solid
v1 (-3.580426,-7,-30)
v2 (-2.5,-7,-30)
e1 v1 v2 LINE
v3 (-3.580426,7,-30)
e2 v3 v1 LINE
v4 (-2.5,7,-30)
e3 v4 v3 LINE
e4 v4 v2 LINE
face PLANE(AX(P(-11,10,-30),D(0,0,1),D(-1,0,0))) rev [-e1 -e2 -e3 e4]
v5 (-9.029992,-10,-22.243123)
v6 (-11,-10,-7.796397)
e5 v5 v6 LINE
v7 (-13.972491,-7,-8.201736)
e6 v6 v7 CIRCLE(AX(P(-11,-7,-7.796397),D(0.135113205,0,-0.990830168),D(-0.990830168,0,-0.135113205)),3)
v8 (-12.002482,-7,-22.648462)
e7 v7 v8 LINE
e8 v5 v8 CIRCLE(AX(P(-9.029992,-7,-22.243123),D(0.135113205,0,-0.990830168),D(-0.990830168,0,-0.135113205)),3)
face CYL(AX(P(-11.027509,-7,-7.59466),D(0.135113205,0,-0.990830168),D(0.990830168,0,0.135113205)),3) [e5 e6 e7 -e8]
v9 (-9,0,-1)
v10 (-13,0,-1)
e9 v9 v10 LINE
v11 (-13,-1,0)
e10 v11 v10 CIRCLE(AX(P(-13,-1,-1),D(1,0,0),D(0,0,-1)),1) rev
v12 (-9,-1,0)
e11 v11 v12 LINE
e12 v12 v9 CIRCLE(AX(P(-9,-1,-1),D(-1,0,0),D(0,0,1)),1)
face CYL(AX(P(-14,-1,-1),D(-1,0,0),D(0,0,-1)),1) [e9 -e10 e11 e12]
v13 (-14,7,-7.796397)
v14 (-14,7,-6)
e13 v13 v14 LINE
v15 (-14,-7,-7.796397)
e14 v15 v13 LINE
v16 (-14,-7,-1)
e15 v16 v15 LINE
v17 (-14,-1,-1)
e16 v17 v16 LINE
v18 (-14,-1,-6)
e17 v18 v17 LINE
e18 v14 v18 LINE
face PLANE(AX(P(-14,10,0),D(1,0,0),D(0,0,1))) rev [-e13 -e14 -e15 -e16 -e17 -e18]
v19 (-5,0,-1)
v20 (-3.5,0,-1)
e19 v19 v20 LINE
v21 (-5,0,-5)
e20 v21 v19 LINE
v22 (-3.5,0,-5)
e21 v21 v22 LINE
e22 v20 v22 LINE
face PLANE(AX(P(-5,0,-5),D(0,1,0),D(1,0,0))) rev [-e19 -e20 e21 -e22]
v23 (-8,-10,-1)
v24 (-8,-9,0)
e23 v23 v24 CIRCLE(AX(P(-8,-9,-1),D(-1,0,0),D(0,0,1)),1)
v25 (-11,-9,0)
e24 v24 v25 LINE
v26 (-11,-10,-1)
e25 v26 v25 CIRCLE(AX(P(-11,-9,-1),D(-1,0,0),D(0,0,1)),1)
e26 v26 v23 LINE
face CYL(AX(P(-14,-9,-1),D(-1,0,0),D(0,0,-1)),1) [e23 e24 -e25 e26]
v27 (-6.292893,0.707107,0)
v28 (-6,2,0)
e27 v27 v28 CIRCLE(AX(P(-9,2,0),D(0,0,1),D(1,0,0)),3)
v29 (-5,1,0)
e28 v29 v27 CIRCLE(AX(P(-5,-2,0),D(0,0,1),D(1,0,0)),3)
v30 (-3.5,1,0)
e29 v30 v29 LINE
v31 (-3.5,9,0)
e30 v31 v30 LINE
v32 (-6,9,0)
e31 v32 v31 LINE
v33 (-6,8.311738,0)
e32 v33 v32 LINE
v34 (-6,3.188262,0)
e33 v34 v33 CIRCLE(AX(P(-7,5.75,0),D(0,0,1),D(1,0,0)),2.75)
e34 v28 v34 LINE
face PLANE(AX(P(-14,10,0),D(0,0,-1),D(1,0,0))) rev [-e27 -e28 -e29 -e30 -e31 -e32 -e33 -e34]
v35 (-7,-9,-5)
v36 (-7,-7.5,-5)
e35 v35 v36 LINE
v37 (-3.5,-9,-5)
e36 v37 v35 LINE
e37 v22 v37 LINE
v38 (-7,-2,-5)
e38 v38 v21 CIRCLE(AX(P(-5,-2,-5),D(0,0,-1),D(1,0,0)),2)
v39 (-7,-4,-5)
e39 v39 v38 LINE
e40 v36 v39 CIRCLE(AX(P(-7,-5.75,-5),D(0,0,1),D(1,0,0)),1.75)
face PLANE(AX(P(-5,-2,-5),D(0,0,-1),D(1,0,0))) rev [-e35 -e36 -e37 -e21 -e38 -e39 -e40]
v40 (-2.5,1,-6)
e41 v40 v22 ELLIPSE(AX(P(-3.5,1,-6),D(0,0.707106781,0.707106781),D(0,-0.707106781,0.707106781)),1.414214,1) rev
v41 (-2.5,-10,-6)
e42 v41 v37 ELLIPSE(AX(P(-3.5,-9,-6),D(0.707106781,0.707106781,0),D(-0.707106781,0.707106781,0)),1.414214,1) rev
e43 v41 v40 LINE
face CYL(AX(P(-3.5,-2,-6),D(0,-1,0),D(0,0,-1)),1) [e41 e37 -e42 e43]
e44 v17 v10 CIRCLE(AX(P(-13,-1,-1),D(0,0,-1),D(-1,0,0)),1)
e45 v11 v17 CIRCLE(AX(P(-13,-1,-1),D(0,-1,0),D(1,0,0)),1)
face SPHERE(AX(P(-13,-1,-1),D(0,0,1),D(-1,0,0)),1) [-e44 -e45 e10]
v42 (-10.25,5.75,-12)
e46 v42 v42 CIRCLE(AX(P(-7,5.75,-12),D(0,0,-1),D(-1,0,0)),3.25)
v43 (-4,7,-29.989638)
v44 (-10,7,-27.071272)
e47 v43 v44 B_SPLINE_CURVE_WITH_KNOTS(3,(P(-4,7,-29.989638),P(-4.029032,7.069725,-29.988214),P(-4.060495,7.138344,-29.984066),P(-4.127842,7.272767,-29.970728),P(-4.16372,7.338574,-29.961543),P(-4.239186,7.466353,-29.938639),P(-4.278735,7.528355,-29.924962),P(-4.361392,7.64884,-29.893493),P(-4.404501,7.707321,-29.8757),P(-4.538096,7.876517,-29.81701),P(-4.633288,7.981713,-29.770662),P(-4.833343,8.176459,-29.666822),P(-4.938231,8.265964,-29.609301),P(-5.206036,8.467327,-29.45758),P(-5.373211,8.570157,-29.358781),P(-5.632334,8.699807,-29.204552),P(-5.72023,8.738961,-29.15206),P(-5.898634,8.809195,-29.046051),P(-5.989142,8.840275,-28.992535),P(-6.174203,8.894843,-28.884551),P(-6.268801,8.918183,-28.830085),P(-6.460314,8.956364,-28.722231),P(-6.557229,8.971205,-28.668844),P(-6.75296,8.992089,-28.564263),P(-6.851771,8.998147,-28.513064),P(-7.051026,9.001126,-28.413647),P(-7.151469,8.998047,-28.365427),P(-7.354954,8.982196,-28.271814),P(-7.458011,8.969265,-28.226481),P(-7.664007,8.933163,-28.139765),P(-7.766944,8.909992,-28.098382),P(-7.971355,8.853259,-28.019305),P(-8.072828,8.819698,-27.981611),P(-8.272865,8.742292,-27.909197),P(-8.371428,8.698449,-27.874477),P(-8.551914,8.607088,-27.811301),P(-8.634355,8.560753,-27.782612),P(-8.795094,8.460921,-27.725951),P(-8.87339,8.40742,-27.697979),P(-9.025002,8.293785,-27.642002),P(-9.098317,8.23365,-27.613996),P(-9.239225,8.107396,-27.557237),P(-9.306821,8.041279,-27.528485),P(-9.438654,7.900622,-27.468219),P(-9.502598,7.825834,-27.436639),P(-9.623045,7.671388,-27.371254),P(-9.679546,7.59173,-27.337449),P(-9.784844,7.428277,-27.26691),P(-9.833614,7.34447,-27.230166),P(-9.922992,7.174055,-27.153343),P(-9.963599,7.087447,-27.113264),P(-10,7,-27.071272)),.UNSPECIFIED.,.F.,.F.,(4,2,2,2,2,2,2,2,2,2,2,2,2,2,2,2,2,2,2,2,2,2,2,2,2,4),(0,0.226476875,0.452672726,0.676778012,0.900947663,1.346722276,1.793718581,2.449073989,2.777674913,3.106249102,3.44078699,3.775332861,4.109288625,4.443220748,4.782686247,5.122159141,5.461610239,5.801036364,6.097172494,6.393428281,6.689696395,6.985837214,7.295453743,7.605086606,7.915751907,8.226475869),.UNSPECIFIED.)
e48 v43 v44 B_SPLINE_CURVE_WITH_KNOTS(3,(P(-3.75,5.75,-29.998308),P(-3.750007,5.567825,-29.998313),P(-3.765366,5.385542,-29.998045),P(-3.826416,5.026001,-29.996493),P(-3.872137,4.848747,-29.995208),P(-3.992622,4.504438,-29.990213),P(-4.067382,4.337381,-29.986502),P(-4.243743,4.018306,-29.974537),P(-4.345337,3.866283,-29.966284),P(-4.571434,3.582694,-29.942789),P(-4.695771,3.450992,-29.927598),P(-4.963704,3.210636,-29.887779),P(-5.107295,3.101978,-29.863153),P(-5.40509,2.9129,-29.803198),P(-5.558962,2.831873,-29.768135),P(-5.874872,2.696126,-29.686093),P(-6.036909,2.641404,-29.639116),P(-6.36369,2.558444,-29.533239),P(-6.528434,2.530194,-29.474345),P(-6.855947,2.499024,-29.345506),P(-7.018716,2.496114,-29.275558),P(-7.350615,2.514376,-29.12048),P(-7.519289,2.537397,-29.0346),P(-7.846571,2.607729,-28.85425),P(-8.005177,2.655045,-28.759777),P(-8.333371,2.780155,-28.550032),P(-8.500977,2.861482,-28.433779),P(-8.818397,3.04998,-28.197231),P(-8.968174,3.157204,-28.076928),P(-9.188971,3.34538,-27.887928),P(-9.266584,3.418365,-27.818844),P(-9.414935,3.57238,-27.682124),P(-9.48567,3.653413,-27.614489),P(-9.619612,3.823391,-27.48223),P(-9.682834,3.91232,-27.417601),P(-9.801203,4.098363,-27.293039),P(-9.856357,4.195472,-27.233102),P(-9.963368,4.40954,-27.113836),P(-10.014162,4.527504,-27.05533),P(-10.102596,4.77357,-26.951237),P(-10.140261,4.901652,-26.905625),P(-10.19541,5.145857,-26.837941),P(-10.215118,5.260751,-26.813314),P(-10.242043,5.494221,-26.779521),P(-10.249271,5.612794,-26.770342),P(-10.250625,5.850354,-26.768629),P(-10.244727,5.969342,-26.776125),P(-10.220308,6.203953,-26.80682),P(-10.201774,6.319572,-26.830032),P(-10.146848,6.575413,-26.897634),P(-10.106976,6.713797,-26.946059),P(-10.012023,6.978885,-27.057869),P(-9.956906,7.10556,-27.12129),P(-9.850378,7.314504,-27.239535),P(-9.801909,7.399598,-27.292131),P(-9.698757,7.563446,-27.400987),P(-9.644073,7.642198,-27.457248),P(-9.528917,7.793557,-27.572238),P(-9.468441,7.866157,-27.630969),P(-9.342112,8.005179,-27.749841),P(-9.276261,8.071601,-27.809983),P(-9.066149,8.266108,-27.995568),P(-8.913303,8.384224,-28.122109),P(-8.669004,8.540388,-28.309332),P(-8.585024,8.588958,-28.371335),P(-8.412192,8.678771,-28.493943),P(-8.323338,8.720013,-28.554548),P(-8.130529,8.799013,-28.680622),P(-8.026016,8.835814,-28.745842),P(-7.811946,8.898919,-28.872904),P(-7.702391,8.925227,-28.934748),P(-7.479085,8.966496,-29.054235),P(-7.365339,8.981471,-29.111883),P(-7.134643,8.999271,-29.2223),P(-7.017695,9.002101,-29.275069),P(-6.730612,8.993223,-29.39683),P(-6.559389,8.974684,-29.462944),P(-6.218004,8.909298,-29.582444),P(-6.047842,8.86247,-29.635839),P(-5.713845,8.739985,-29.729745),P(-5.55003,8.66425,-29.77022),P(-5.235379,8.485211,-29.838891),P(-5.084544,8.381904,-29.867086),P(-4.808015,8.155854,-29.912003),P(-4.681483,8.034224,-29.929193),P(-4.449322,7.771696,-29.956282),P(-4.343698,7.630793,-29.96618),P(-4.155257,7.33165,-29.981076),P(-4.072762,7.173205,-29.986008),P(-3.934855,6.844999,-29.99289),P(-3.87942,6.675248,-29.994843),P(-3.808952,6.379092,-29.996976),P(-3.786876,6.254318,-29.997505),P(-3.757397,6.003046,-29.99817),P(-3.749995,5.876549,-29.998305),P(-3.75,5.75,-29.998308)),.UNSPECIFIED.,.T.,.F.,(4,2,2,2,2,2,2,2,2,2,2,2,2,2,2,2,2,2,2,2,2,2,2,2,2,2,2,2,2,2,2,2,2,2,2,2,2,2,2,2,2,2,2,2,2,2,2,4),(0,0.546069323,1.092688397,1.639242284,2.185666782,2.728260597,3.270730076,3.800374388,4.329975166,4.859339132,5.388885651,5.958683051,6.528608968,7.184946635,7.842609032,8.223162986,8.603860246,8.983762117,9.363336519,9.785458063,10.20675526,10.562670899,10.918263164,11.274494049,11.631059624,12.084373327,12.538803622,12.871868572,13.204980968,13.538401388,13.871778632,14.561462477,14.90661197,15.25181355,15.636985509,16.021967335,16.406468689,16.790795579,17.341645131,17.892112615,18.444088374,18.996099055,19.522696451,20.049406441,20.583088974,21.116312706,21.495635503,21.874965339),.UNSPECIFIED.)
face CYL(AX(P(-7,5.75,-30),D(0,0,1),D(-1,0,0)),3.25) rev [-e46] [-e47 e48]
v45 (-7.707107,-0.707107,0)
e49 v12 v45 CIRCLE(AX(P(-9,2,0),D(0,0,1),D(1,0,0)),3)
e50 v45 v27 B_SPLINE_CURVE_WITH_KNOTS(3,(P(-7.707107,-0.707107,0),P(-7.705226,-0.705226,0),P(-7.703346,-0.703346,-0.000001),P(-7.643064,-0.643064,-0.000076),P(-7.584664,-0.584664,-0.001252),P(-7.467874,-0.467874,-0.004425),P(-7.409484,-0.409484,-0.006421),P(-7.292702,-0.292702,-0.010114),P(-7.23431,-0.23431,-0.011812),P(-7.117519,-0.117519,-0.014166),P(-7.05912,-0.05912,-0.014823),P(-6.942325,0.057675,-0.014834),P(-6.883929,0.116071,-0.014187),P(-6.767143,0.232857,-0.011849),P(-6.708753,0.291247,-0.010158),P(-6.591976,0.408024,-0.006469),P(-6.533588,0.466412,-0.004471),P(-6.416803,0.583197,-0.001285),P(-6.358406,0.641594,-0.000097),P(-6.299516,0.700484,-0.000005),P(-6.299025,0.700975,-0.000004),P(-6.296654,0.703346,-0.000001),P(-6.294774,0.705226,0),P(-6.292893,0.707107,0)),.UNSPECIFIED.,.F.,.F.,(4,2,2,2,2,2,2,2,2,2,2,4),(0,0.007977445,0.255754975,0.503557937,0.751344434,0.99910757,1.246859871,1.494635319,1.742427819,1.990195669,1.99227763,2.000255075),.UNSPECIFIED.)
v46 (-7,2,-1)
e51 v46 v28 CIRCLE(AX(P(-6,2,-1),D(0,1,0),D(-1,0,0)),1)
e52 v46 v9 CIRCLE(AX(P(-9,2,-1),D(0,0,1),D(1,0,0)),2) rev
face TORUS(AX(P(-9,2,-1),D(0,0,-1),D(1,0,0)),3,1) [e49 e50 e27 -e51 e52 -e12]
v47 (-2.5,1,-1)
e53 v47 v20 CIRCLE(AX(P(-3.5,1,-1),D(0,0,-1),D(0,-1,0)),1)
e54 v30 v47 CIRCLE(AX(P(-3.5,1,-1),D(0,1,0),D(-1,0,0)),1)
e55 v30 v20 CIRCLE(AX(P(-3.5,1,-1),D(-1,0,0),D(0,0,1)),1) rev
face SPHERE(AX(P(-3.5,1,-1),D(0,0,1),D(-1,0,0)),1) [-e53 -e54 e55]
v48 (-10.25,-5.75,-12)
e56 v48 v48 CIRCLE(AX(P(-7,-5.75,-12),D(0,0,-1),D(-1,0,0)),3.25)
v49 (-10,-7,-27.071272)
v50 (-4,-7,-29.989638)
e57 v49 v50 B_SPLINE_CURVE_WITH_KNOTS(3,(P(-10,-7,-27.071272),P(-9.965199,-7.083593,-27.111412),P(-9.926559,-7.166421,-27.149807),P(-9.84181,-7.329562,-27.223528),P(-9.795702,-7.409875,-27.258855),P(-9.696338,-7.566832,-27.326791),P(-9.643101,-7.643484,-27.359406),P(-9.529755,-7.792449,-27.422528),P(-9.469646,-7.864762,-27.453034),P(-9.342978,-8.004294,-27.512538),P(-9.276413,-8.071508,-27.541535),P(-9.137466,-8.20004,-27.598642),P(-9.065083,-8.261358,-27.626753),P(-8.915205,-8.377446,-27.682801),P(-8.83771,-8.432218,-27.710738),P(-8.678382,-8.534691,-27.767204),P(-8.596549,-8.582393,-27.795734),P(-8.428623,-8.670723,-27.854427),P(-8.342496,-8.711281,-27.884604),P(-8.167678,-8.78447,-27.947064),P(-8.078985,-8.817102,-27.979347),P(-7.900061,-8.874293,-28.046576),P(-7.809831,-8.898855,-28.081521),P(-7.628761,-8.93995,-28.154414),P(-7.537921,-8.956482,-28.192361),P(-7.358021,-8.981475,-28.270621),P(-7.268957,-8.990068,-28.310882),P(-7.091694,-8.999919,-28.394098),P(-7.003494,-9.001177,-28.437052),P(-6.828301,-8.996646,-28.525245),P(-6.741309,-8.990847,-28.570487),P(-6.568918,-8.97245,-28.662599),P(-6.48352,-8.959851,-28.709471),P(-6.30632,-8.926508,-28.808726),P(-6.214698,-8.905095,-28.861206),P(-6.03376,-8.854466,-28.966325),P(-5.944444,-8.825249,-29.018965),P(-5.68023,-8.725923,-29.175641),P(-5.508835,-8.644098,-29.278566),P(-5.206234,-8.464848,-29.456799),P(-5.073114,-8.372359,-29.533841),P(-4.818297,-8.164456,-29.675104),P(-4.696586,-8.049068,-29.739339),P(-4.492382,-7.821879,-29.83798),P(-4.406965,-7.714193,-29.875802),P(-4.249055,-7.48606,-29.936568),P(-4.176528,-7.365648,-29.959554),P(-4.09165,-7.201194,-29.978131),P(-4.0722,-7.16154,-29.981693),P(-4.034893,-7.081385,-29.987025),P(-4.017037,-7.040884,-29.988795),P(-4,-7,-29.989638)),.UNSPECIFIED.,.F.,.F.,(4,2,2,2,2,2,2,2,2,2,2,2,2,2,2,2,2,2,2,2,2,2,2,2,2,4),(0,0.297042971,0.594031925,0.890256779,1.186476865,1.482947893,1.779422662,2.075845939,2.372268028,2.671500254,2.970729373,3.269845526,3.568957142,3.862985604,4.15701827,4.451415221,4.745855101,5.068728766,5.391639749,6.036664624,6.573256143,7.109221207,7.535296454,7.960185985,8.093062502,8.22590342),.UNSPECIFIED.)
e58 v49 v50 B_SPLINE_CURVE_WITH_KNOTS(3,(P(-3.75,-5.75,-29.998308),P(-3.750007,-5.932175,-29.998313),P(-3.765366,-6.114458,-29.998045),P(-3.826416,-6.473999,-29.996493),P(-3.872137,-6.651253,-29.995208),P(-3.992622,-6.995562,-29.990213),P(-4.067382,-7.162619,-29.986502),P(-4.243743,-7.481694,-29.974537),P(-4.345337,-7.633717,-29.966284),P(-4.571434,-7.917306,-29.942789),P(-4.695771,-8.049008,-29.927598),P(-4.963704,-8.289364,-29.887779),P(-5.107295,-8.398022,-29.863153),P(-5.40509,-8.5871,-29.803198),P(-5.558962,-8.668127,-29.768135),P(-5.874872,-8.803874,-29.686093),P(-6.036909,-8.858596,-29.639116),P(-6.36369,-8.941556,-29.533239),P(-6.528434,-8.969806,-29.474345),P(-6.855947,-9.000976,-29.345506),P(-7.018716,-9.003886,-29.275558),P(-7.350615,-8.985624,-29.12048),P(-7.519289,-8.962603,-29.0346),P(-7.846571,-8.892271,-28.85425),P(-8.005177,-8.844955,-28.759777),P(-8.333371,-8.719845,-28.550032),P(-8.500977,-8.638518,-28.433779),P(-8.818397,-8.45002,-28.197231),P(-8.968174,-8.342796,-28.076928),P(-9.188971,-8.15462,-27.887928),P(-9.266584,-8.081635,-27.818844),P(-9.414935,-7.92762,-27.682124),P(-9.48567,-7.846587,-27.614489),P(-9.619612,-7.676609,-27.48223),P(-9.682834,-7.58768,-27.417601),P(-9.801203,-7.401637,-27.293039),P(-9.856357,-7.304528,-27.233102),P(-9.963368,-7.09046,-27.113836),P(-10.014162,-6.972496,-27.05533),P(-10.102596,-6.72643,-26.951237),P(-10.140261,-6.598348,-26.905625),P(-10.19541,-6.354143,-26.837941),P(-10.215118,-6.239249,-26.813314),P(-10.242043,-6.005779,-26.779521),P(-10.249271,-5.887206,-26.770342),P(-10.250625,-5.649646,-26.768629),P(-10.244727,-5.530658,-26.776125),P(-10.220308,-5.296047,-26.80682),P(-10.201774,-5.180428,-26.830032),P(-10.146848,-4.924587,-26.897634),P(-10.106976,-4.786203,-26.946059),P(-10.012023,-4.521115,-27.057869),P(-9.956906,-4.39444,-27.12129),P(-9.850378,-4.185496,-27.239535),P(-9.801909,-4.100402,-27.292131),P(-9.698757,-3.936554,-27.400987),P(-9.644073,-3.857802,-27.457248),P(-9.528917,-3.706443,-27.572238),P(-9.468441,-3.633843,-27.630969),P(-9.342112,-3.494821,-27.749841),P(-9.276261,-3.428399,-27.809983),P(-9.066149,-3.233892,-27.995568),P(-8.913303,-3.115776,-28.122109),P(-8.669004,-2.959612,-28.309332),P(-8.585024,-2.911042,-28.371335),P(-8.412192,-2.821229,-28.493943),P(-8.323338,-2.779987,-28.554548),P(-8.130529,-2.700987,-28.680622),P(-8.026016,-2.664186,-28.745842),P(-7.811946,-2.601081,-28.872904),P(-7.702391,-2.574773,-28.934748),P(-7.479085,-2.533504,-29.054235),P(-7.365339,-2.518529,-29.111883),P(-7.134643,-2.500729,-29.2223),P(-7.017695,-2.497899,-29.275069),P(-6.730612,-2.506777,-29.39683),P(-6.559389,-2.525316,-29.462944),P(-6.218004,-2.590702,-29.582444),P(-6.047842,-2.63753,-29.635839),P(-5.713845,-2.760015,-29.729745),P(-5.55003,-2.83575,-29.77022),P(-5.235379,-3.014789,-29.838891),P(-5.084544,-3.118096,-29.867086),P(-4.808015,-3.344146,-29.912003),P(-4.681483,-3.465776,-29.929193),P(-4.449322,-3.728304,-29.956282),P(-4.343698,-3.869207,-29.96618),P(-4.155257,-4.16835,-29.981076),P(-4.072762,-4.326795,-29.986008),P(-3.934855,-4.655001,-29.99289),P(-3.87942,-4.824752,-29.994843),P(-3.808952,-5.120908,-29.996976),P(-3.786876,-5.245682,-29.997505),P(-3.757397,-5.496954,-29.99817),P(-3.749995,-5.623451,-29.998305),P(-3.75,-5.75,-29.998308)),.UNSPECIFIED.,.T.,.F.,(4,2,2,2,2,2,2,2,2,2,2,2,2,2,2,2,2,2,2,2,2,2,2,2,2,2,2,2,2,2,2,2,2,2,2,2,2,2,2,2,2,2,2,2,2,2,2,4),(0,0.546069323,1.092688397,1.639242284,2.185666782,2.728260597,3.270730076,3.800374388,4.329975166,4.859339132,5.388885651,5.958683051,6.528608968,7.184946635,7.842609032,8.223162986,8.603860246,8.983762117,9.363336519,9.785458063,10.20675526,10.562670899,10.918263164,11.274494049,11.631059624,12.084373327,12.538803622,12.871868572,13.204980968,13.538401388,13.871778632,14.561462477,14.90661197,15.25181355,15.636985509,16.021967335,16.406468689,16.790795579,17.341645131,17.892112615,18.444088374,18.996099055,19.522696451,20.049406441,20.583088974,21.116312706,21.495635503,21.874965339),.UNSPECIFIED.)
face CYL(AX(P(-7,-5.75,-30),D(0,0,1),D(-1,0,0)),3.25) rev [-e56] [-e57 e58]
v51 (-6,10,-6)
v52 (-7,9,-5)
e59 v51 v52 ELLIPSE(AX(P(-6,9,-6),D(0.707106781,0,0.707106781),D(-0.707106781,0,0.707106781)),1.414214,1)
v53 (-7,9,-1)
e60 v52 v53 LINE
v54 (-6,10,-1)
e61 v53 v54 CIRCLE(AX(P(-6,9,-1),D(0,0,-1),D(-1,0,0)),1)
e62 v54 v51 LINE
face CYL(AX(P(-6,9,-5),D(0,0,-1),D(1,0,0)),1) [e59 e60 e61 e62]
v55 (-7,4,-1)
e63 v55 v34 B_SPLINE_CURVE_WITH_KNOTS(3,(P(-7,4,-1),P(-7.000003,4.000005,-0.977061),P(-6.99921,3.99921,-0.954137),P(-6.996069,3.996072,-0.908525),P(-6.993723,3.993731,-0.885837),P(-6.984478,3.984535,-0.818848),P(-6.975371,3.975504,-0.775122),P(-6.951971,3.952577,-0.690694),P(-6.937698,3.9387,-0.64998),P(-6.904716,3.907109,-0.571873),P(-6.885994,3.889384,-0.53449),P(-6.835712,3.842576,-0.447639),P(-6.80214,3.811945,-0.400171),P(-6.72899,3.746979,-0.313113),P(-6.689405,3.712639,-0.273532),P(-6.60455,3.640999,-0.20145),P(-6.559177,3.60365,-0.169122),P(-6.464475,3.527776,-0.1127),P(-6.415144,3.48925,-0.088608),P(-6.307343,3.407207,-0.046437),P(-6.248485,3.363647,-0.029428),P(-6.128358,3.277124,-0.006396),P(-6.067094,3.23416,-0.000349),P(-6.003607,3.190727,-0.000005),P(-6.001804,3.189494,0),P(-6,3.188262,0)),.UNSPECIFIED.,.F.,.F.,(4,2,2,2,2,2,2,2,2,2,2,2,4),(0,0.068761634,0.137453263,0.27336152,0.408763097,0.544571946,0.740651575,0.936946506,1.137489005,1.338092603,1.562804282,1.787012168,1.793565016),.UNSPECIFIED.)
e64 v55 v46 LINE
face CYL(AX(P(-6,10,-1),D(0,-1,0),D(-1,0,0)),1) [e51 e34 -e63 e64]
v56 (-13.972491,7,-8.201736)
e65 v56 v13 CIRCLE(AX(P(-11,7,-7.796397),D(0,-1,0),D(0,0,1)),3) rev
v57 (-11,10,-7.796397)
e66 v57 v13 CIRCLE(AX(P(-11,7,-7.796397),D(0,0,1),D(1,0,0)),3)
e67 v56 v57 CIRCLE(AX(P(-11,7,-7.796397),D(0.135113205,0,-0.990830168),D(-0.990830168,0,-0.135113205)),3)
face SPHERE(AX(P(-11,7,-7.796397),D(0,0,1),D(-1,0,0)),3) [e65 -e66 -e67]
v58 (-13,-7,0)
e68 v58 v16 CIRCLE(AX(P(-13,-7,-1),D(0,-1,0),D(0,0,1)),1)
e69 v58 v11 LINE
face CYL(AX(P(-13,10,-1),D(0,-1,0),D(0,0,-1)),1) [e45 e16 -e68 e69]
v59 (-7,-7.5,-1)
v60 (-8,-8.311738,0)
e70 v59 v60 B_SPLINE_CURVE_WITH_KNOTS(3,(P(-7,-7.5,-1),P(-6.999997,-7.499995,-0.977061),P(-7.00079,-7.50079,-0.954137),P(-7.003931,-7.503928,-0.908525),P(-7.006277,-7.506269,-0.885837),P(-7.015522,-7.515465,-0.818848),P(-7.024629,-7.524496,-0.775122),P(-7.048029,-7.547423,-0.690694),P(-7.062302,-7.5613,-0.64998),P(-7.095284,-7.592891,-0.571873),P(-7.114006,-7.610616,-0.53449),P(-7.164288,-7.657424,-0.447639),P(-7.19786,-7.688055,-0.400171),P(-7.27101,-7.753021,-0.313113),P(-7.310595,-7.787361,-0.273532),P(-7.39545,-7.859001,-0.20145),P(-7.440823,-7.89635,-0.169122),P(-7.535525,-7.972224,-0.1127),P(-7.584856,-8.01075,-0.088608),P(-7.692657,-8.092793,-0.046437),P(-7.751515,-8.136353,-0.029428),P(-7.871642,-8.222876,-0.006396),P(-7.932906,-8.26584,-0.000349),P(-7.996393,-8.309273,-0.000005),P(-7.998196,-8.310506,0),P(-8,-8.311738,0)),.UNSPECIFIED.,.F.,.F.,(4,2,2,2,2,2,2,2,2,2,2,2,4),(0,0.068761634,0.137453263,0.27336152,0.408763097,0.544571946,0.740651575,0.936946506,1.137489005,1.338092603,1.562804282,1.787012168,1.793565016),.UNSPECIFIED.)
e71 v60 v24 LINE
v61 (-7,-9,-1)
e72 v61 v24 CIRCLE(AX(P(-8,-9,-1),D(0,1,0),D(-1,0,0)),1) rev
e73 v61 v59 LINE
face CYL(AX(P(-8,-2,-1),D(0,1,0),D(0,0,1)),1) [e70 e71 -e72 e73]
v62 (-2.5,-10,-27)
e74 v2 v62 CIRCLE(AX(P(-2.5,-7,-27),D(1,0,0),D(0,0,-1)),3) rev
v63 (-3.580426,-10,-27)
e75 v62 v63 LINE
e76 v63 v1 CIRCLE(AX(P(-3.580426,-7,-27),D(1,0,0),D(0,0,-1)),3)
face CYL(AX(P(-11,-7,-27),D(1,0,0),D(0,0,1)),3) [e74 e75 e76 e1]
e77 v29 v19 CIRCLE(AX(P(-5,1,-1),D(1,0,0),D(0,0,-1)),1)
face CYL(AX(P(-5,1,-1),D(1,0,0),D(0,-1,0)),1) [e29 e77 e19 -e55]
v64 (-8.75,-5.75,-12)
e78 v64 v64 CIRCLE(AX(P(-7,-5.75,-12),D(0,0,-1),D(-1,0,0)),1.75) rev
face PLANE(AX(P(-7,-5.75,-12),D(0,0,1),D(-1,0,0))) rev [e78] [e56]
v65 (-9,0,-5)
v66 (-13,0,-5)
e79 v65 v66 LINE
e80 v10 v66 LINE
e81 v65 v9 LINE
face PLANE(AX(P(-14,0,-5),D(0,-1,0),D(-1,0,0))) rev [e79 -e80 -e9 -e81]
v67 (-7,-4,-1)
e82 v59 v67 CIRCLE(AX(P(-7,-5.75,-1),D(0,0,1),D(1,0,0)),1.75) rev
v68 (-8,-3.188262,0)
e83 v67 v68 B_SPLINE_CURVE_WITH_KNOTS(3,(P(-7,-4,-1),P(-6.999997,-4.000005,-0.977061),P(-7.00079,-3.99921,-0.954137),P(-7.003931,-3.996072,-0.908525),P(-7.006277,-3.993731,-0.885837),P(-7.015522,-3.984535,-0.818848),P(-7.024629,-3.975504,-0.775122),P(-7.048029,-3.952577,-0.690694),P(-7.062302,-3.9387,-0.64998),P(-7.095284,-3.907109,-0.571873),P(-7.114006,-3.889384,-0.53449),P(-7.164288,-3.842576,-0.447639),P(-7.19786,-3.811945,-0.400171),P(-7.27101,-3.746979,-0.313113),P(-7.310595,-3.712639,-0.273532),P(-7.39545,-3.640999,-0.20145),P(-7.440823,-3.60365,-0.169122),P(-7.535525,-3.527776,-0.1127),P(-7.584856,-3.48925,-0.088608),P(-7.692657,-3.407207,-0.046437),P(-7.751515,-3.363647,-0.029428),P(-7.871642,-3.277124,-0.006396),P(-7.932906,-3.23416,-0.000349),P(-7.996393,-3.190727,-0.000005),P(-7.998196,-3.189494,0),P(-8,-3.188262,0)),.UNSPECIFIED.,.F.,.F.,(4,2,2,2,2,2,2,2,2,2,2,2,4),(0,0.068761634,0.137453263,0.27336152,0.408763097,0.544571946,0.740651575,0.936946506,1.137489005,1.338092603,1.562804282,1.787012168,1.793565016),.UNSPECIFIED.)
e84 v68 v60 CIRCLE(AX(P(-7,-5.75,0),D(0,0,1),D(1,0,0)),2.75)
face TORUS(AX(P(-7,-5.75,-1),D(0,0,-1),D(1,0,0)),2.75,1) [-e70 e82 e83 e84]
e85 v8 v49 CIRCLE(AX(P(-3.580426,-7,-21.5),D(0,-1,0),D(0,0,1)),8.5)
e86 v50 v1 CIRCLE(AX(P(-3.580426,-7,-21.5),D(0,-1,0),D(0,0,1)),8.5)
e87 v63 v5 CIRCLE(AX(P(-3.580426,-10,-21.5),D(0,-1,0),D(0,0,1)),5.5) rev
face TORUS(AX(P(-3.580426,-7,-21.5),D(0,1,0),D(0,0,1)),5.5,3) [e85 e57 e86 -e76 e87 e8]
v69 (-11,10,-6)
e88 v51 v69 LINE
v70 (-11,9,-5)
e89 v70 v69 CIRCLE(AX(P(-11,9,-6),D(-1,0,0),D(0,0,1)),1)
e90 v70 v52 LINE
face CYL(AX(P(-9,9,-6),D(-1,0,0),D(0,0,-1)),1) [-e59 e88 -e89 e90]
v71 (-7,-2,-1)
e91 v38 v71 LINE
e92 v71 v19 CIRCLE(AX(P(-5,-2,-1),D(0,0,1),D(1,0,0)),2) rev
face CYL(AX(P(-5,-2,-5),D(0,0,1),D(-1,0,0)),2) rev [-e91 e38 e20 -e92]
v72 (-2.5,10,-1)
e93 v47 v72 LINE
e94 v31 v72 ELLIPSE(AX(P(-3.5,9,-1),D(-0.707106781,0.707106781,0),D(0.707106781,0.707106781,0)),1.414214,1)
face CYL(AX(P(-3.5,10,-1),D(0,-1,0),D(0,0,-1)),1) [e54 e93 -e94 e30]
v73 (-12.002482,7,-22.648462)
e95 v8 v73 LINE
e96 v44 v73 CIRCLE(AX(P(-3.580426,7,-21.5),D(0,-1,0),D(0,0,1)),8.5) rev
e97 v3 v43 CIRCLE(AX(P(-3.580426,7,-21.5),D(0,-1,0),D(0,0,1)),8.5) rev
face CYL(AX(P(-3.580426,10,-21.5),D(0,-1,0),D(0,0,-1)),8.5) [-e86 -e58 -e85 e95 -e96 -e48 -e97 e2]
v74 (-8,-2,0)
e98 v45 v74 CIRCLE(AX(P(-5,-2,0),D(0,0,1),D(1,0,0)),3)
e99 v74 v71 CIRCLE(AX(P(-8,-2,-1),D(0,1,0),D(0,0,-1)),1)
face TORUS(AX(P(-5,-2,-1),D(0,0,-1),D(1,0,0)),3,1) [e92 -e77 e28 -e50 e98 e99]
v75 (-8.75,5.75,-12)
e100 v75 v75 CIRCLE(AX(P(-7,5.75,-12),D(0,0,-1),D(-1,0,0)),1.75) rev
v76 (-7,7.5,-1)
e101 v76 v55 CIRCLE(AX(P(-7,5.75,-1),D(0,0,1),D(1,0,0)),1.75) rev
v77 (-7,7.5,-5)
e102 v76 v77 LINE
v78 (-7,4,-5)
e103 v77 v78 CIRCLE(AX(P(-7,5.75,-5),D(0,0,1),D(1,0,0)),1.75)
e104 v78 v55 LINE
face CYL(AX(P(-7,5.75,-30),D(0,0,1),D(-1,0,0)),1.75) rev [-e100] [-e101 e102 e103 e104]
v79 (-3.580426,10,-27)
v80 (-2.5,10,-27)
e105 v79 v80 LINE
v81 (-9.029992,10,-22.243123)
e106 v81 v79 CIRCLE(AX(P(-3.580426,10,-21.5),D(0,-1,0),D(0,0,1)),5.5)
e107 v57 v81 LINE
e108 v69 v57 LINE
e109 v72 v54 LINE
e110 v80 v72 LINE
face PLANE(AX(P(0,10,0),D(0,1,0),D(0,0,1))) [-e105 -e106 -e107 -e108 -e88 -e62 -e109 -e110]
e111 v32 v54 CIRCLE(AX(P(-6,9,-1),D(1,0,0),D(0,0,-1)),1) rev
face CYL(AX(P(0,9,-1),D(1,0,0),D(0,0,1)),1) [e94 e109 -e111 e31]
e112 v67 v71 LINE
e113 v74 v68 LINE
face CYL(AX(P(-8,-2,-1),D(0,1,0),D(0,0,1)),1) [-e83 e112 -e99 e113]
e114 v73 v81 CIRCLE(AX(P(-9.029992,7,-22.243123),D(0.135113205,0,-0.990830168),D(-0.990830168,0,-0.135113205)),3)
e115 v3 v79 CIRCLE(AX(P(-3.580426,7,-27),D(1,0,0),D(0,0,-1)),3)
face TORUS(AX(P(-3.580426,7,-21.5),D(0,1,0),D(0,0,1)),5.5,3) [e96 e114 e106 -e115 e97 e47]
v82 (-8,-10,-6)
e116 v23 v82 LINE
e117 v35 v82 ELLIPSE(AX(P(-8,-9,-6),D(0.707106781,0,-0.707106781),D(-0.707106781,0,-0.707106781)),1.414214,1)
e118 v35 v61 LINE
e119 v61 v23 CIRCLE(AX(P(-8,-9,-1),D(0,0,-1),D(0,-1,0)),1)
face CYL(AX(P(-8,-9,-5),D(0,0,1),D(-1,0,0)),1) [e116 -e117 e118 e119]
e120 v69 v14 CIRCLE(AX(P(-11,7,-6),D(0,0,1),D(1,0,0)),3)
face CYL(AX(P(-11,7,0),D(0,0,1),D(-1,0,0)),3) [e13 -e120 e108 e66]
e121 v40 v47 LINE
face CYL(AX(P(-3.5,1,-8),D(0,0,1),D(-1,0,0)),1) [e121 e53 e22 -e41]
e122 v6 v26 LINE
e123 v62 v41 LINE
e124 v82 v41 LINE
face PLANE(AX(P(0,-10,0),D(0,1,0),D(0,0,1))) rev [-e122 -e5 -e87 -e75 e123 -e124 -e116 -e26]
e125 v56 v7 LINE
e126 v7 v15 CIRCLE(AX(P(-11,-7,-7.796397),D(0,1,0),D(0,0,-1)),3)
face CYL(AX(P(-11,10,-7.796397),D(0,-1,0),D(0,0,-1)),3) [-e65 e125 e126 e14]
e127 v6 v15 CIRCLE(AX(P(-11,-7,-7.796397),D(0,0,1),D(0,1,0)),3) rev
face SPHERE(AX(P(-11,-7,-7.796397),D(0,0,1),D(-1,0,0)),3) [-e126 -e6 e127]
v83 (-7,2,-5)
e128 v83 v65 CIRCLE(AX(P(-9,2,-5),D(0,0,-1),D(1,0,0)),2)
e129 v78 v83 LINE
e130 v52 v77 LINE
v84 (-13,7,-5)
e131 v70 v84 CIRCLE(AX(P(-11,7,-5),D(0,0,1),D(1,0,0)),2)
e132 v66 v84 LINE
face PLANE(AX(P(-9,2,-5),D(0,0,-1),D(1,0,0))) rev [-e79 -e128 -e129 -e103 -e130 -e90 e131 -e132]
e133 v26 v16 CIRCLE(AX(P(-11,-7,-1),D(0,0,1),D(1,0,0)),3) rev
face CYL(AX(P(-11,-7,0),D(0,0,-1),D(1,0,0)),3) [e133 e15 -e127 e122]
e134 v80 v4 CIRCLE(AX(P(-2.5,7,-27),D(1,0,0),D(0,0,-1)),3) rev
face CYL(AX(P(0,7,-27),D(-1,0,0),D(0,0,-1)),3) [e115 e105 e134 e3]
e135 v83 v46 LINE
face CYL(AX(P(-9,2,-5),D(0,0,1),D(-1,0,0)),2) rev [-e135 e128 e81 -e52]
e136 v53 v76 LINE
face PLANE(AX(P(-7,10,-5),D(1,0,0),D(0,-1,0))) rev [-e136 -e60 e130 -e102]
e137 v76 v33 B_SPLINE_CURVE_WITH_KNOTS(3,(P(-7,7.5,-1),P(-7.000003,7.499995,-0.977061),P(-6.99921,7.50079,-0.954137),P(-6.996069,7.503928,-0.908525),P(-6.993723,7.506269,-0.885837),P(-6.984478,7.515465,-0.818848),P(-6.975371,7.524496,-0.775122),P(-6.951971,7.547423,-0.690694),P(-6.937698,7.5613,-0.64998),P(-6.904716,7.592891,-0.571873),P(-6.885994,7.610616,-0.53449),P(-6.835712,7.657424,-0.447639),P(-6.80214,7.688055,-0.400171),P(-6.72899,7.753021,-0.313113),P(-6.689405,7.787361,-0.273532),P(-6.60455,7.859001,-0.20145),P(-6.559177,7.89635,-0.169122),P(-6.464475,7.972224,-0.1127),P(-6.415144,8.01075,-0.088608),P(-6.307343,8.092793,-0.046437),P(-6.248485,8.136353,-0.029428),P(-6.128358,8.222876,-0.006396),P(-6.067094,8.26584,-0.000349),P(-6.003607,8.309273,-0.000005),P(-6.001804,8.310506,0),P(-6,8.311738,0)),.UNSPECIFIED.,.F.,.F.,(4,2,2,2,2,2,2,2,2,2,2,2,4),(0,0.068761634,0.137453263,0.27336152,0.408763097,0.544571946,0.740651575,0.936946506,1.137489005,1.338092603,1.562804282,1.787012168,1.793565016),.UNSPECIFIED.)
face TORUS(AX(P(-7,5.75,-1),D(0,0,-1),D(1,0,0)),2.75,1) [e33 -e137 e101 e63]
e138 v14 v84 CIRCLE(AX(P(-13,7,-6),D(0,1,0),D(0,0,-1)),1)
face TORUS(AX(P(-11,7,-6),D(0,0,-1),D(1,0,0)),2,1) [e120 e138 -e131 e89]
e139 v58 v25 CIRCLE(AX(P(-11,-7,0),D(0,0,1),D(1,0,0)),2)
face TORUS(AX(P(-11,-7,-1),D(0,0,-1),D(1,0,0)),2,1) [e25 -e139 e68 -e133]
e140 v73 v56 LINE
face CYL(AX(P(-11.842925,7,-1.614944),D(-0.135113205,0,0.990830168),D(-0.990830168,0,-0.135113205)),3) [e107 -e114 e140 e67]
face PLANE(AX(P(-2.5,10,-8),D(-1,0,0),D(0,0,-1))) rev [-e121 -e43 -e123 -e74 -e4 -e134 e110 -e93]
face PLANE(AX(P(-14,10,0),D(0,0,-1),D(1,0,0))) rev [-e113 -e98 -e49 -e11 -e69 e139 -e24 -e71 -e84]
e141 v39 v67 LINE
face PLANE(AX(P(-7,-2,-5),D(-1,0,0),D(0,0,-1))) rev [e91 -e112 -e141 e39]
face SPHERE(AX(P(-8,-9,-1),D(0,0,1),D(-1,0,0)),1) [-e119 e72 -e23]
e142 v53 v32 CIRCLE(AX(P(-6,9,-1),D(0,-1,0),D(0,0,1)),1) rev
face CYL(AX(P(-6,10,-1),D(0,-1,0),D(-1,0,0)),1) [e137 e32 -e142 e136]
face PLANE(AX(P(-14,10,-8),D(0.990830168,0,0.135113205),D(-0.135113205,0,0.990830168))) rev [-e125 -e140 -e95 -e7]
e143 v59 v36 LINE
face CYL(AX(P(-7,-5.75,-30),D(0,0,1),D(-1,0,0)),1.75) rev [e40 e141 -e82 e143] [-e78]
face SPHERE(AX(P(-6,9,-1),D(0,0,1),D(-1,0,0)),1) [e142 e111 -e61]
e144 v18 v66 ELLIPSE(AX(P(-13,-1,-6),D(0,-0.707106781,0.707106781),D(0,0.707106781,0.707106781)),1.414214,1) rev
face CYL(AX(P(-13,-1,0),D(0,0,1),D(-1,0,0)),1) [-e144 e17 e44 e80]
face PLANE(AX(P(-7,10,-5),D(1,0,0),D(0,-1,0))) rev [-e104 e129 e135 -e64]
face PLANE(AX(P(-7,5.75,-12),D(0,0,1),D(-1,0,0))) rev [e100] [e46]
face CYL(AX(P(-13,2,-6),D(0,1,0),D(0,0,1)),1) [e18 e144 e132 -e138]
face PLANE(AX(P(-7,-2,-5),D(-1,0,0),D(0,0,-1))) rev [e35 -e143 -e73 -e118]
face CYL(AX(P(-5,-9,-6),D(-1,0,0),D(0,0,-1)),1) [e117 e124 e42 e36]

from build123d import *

# Parameters (mm, degrees)
BOSS_EXTRUDE1_DEPTH     = 10
CUT_EXTRUDE1_DEPTH      = 5
CUT_EXTRUDE2_DEPTH      = 35.583232932
CUT_EXTRUDE2_DEPTH_BACK = 35.583232932
SKETCH3_R               = 1.75
CUT_EXTRUDE3_START      = -12
SKETCH4_R               = 3.25
CUT_EXTRUDE3_DEPTH      = 23.583232932
FILLET1_R               = 8.5
FILLET2_R               = 1
FILLET3_R               = 3


with BuildPart() as part:
    # Sketch1 → Boss-Extrude1 (new, symmetric)
    with BuildSketch(Plane(origin=(0, 0, 0), x_dir=(1, 0, 0), z_dir=(0, 1, 0))):
        Polygon((14, 0), (14, 8), (11, 30), (2.5, 30), (2.5, 8), (2.5, 0), align=None)
    extrude(amount=BOSS_EXTRUDE1_DEPTH, both=True)

    # Sketch2 → Cut-Extrude1 (cut)
    with BuildSketch(Plane.XY):
        with BuildLine():
            Line((14, 10), (7, 10))
            Line((7, 10), (7, 2))
            ThreePointArc((7, 2), (7.585786438, 0.585786438), (9, 0))
            Line((9, 0), (14, 0))
            Line((14, 0), (14, 10))
        make_face()
        with BuildLine():
            Line((5, 0), (2.5, 0))
            Line((2.5, 0), (2.5, -10))
            Line((2.5, -10), (7, -10))
            Line((7, -10), (7, -2))
            ThreePointArc((7, -2), (6.414213562, -0.585786438), (5, 0))
        make_face()
    extrude(amount=-CUT_EXTRUDE1_DEPTH, mode=Mode.SUBTRACT)

    # Sketch3 → Cut-Extrude2 (cut, two sides: drawn at the far end of the back side and taken through both)
    with BuildSketch(Plane.XY.offset(-CUT_EXTRUDE2_DEPTH_BACK)):
        with Locations((7, 5.75)):
            Circle(SKETCH3_R)
        with Locations((7, -5.75)):
            Circle(SKETCH3_R)
    extrude(amount=CUT_EXTRUDE2_DEPTH + CUT_EXTRUDE2_DEPTH_BACK, mode=Mode.SUBTRACT)

    # Sketch4 → Cut-Extrude3 (cut, through all)
    with BuildSketch(Plane.XY.offset(CUT_EXTRUDE3_START)):
        with Locations((7, 5.75)):
            Circle(SKETCH4_R)
        with Locations((7, -5.75)):
            Circle(SKETCH4_R)
    extrude(amount=-CUT_EXTRUDE3_DEPTH, mode=Mode.SUBTRACT)

    # Fillet1
    # the kernel refuses this fillet: 8.5 mm, written as the material it takes off along each edge
    with BuildSketch(Plane(origin=(11, -28.548935016, -30), x_dir=(0.1351132047333134, 0, 0.9908301680442989), z_dir=(0, 1, 0))) as fillet1_piece_1:
        with BuildLine():
            CenterArc((FILLET1_R * 0.872891059599, -FILLET1_R), FILLET1_R, 90, 82.234833982)
            Line((-FILLET1_R * 0.117939108445, -FILLET1_R * 0.864886795267), (0, 0))
            Line((0, 0), (FILLET1_R * 0.872891059599, 0))
        make_face()
    extrude(amount=57.097870033, mode=Mode.SUBTRACT)

    # Fillet2
    # the kernel refuses this fillet: 1 mm, written as the material it takes off along each edge
    with BuildSketch(Plane(origin=(3.5, 1, -1), x_dir=(0, -1, 0), z_dir=(0, 0, 1))) as fillet2_piece_1_section:
        Polygon((0, 0), (FILLET2_R, 0), (FILLET2_R, -FILLET2_R), (0, -FILLET2_R), align=None)
    fillet2_piece_1 = extrude(amount=FILLET2_R, mode=Mode.PRIVATE)
    fillet2_piece_1 = fillet2_piece_1 - Plane(origin=(3.5, 1, -1), x_dir=(0.7071067811865475, 0.7071067811865476, 0), z_dir=(0, 0, 1)) * Sphere(FILLET2_R, mode=Mode.PRIVATE)
    add(fillet2_piece_1, mode=Mode.SUBTRACT)
    with BuildSketch(Plane(origin=(8, -9, -1), x_dir=(0, -1, 0), z_dir=(0, 0, 1))) as fillet2_piece_2_section:
        Polygon((0, 0), (FILLET2_R, 0), (FILLET2_R, -FILLET2_R), (0, -FILLET2_R), align=None)
    fillet2_piece_2 = extrude(amount=FILLET2_R, mode=Mode.PRIVATE)
    fillet2_piece_2 = fillet2_piece_2 - Plane(origin=(8, -9, -1), x_dir=(0.7071067811865475, 0.7071067811865475, 0), z_dir=(0, 0, 1)) * Sphere(FILLET2_R, mode=Mode.PRIVATE)
    add(fillet2_piece_2, mode=Mode.SUBTRACT)
    with BuildSketch(Plane(origin=(13, -1, -1), x_dir=(0, 0, 1), z_dir=(1, 0, 0))) as fillet2_piece_3_section:
        Polygon((0, 0), (FILLET2_R, 0), (FILLET2_R, -FILLET2_R), (0, -FILLET2_R), align=None)
    fillet2_piece_3 = extrude(amount=FILLET2_R, mode=Mode.PRIVATE)
    fillet2_piece_3 = fillet2_piece_3 - Plane(origin=(13, -1, -1), x_dir=(0, -0.7071067811865475, -0.7071067811865475), z_dir=(1, 0, 0)) * Sphere(FILLET2_R, mode=Mode.PRIVATE)
    add(fillet2_piece_3, mode=Mode.SUBTRACT)
    with BuildSketch(Plane(origin=(6, 9, -1), x_dir=(0, 1, 0), z_dir=(0, 0, 1))) as fillet2_piece_4_section:
        Polygon((0, 0), (FILLET2_R, 0), (FILLET2_R, -FILLET2_R), (0, -FILLET2_R), align=None)
    fillet2_piece_4 = extrude(amount=FILLET2_R, mode=Mode.PRIVATE)
    fillet2_piece_4 = fillet2_piece_4 - Plane(origin=(6, 9, -1), x_dir=(-0.7071067811865475, -0.7071067811865477, 0), z_dir=(0, 0, 1)) * Sphere(FILLET2_R, mode=Mode.PRIVATE)
    add(fillet2_piece_4, mode=Mode.SUBTRACT)
    with BuildSketch(Plane(origin=(2.5, 12.5, 0), x_dir=(1, 0, 0), z_dir=(0, -1, 0)), Plane(origin=(14, -1, 0), x_dir=(0, 0, -1), z_dir=(0, -1, 0))) as fillet2_piece_5:
        with BuildLine():
            CenterArc((FILLET2_R, -FILLET2_R), FILLET2_R, 90, 90)
            Line((0, -FILLET2_R), (0, 0))
            Line((0, 0), (FILLET2_R, 0))
        make_face()
    extrude(amount=11.5, mode=Mode.SUBTRACT)
    with BuildSketch(Plane(origin=(8, -10, 0), x_dir=(0, 1, 0), z_dir=(1, 0, 0))) as fillet2_piece_6:
        with BuildLine():
            CenterArc((FILLET2_R, -FILLET2_R), FILLET2_R, 90, 90)
            Line((0, -FILLET2_R), (0, 0))
            Line((0, 0), (FILLET2_R, 0))
        make_face()
    extrude(amount=8.5, mode=Mode.SUBTRACT)
    with BuildSketch(Plane(origin=(2.5, 0, -5), x_dir=(0, 0, -1), z_dir=(0, -1, 0)), Plane(origin=(14, 0, -5), x_dir=(0, 0, -1), z_dir=(0, 1, 0))) as fillet2_piece_7:
        with BuildLine():
            CenterArc((FILLET2_R, FILLET2_R), FILLET2_R, 180, 90)
            Line((0, FILLET2_R), (0, 0))
            Line((0, 0), (FILLET2_R, 0))
        make_face()
    extrude(amount=12.5, mode=Mode.SUBTRACT)
    with BuildSketch(Plane(origin=(2.5, 0, -1), x_dir=(1, 0, 0), z_dir=(0, 0, -1)), Plane(origin=(7, -10, -1), x_dir=(1, 0, 0), z_dir=(0, 0, -1)), Plane(origin=(7, 10, -1), x_dir=(-1, 0, 0), z_dir=(0, 0, -1))) as fillet2_piece_8:
        with BuildLine():
            CenterArc((FILLET2_R, -FILLET2_R), FILLET2_R, 90, 90)
            Line((0, -FILLET2_R), (0, 0))
            Line((0, 0), (FILLET2_R, 0))
        make_face()
    extrude(amount=4, mode=Mode.SUBTRACT)
    with BuildSketch(Plane(origin=(0, -10, -5), x_dir=(0, 0, -1), z_dir=(1, 0, 0))) as fillet2_piece_9:
        with BuildLine():
            CenterArc((FILLET2_R, FILLET2_R), FILLET2_R, 180, 90)
            Line((0, FILLET2_R), (0, 0))
            Line((0, 0), (FILLET2_R, 0))
        make_face()
    extrude(amount=7, mode=Mode.SUBTRACT)
    with BuildSketch(Plane(origin=(7, -9, 0), x_dir=(1, 0, 0), z_dir=(0, 1, 0)), Plane(origin=(14, 0, -1), x_dir=(0, -1, 0), z_dir=(0, 0, -1)), Plane(origin=(7, 9, 0), x_dir=(-1, 0, 0), z_dir=(0, -1, 0)), Plane(origin=(9, 0, 0), x_dir=(0, -1, 0), z_dir=(1, 0, 0))) as fillet2_piece_10:
        with BuildLine():
            CenterArc((FILLET2_R, FILLET2_R), FILLET2_R, 180, 90)
            Line((0, FILLET2_R), (0, 0))
            Line((0, 0), (FILLET2_R, 0))
        make_face()
    extrude(amount=4, mode=Mode.SUBTRACT)
    with BuildSketch(Plane(origin=(5, -2, 0), x_dir=(1, 0, 0), z_dir=(0, -1, 0))) as fillet2_piece_11:
        with BuildLine():
            CenterArc((2 + FILLET2_R, -FILLET2_R), FILLET2_R, 90, 90)
            Line((2, -FILLET2_R), (2, 0))
            Line((2, 0), (2 + FILLET2_R, 0))
        make_face()
    revolve(axis=Axis((5, -2, 0), (0, 0, 1)), revolution_arc=90, mode=Mode.SUBTRACT)
    with BuildSketch(Plane(origin=(5, 0, 0), x_dir=(0, 1, 0), z_dir=(-1, 0, 0))) as fillet2_piece_12:
        with BuildLine():
            CenterArc((FILLET2_R, FILLET2_R), FILLET2_R, 180, 90)
            Line((0, FILLET2_R), (0, 0))
            Line((0, 0), (FILLET2_R, 0))
        make_face()
    extrude(amount=1.5, mode=Mode.SUBTRACT)
    with BuildSketch(Plane(origin=(16.5, 10, -5), x_dir=(0, -1, 0), z_dir=(-1, 0, 0))) as fillet2_piece_13:
        with BuildLine():
            CenterArc((FILLET2_R, -FILLET2_R), FILLET2_R, 90, 90)
            Line((0, -FILLET2_R), (0, 0))
            Line((0, 0), (FILLET2_R, 0))
        make_face()
    extrude(amount=9.5, mode=Mode.SUBTRACT)
    with BuildSketch(Plane(origin=(9, 2, 0), x_dir=(-1, 0, 0), z_dir=(0, 1, 0))) as fillet2_piece_14:
        with BuildLine():
            CenterArc((2 + FILLET2_R, -FILLET2_R), FILLET2_R, 90, 90)
            Line((2, -FILLET2_R), (2, 0))
            Line((2, 0), (2 + FILLET2_R, 0))
        make_face()
    revolve(axis=Axis((9, 2, 0), (0, 0, 1)), revolution_arc=90, mode=Mode.SUBTRACT)
    with BuildSketch(Plane(origin=(0, 10, 0), x_dir=(0, -1, 0), z_dir=(1, 0, 0))) as fillet2_piece_15:
        with BuildLine():
            CenterArc((FILLET2_R, FILLET2_R), FILLET2_R, 180, 90)
            Line((0, FILLET2_R), (0, 0))
            Line((0, 0), (FILLET2_R, 0))
        make_face()
    extrude(amount=6, mode=Mode.SUBTRACT)
    with BuildSketch(Plane(origin=(7, 6.5, 0), x_dir=(-1, 0, 0), z_dir=(0, -1, 0)), Plane(origin=(7, -6.5, 0), x_dir=(1, 0, 0), z_dir=(0, 1, 0))) as fillet2_piece_16:
        with BuildLine():
            CenterArc((FILLET2_R, FILLET2_R), FILLET2_R, 180, 90)
            Line((0, FILLET2_R), (0, 0))
            Line((0, 0), (FILLET2_R, 0))
        make_face()
    extrude(amount=4.5, mode=Mode.SUBTRACT)
    with BuildSketch(Plane(origin=(7, 5.75, 0), x_dir=(0.9902261125437348, 0.13947130900842136, 0), z_dir=(0.13947130900842136, -0.9902261125437348, 0))) as fillet2_piece_17:
        with BuildLine():
            CenterArc((1.75 + FILLET2_R, -FILLET2_R), FILLET2_R, 90, 90)
            Line((1.75, -FILLET2_R), (1.75, 0))
            Line((1.75, 0), (1.75 + FILLET2_R, 0))
        make_face()
    revolve(axis=Axis((7, 5.75, 0), (0, 0, 1)), revolution_arc=343.965491315, mode=Mode.SUBTRACT)
    with BuildSketch(Plane(origin=(7, -5.75, 0), x_dir=(1, 0, 0), z_dir=(0, -1, 0))) as fillet2_piece_18:
        with BuildLine():
            CenterArc((1.75 + FILLET2_R, -FILLET2_R), FILLET2_R, 90, 90)
            Line((1.75, -FILLET2_R), (1.75, 0))
            Line((1.75, 0), (1.75 + FILLET2_R, 0))
        make_face()
    revolve(axis=Axis((7, -5.75, 0), (0, 0, 1)), revolution_arc=171.88399385, mode=Mode.SUBTRACT)
    with BuildSketch(Plane(origin=(7, -5.75, 0), x_dir=(-0.9899842569145015, -0.1411777994638043, 0), z_dir=(-0.1411777994638043, 0.9899842569145015, 0))) as fillet2_piece_19:
        with BuildLine():
            CenterArc((1.75 + FILLET2_R, -FILLET2_R), FILLET2_R, 90, 90)
            Line((1.75, -FILLET2_R), (1.75, 0))
            Line((1.75, 0), (1.75 + FILLET2_R, 0))
        make_face()
    revolve(axis=Axis((7, -5.75, 0), (0, 0, 1)), revolution_arc=171.88399385, mode=Mode.SUBTRACT)
    with BuildSketch(Plane(origin=(2.5, 0, -1), x_dir=(1, 0, 0), z_dir=(0, 0, -1))) as fillet2_piece_20a_section:
        with BuildLine():
            CenterArc((FILLET2_R, -FILLET2_R), FILLET2_R, 90, 90)
            Line((0, -FILLET2_R), (0, 0))
            Line((0, 0), (FILLET2_R, 0))
        make_face()
    fillet2_piece_20a = extrude(amount=6.5, mode=Mode.PRIVATE)
    fillet2_piece_20a = split(fillet2_piece_20a, bisect_by=Plane(origin=(2.726395114, 0.226395114, -5), z_dir=(0, 0, -1)), keep=Keep.TOP, mode=Mode.PRIVATE)
    with BuildSketch(Plane(origin=(2.5, 2.5, -5), x_dir=(0, 0, -1), z_dir=(0, -1, 0))) as fillet2_piece_20b_section:
        with BuildLine():
            CenterArc((FILLET2_R, FILLET2_R), FILLET2_R, 180, 90)
            Line((0, FILLET2_R), (0, 0))
            Line((0, 0), (FILLET2_R, 0))
        make_face()
    fillet2_piece_20b = extrude(amount=15, mode=Mode.PRIVATE)
    fillet2_piece_20b = split(fillet2_piece_20b, bisect_by=Plane(origin=(2.726395114, 0, -5.226395114), z_dir=(0, 1, 0)), keep=Keep.TOP, mode=Mode.PRIVATE)
    fillet2_piece_20 = fillet2_piece_20a & fillet2_piece_20b
    add(fillet2_piece_20, mode=Mode.SUBTRACT)
    with BuildSketch(Plane(origin=(7, -10, -1), x_dir=(1, 0, 0), z_dir=(0, 0, -1))) as fillet2_piece_21a_section:
        with BuildLine():
            CenterArc((FILLET2_R, -FILLET2_R), FILLET2_R, 90, 90)
            Line((0, -FILLET2_R), (0, 0))
            Line((0, 0), (FILLET2_R, 0))
        make_face()
    fillet2_piece_21a = extrude(amount=6.5, mode=Mode.PRIVATE)
    fillet2_piece_21a = split(fillet2_piece_21a, bisect_by=Plane(origin=(7.226395114, -9.773604886, -5), z_dir=(0, 0, -1)), keep=Keep.TOP, mode=Mode.PRIVATE)
    with BuildSketch(Plane(origin=(0, -10, -5), x_dir=(0, 0, -1), z_dir=(1, 0, 0))) as fillet2_piece_21b_section:
        with BuildLine():
            CenterArc((FILLET2_R, FILLET2_R), FILLET2_R, 180, 90)
            Line((0, FILLET2_R), (0, 0))
            Line((0, 0), (FILLET2_R, 0))
        make_face()
    fillet2_piece_21b = extrude(amount=9.5, mode=Mode.PRIVATE)
    fillet2_piece_21b = split(fillet2_piece_21b, bisect_by=Plane(origin=(7, -9.773604886, -5.226395114), z_dir=(1, 0, 0)), keep=Keep.TOP, mode=Mode.PRIVATE)
    fillet2_piece_21 = fillet2_piece_21a & fillet2_piece_21b
    add(fillet2_piece_21, mode=Mode.SUBTRACT)
    with BuildSketch(Plane(origin=(14, 0, -1), x_dir=(0, -1, 0), z_dir=(0, 0, -1))) as fillet2_piece_22a_section:
        with BuildLine():
            CenterArc((FILLET2_R, FILLET2_R), FILLET2_R, 180, 90)
            Line((0, FILLET2_R), (0, 0))
            Line((0, 0), (FILLET2_R, 0))
        make_face()
    fillet2_piece_22a = extrude(amount=6.5, mode=Mode.PRIVATE)
    fillet2_piece_22a = split(fillet2_piece_22a, bisect_by=Plane(origin=(13.773604886, -0.226395114, -5), z_dir=(0, 0, -1)), keep=Keep.TOP, mode=Mode.PRIVATE)
    with BuildSketch(Plane(origin=(14, -2.5, -5), x_dir=(0, 0, -1), z_dir=(0, 1, 0))) as fillet2_piece_22b_section:
        with BuildLine():
            CenterArc((FILLET2_R, FILLET2_R), FILLET2_R, 180, 90)
            Line((0, FILLET2_R), (0, 0))
            Line((0, 0), (FILLET2_R, 0))
        make_face()
    fillet2_piece_22b = extrude(amount=15, mode=Mode.PRIVATE)
    fillet2_piece_22b = split(fillet2_piece_22b, bisect_by=Plane(origin=(13.773604886, 0, -5.226395114), z_dir=(0, -1, 0)), keep=Keep.TOP, mode=Mode.PRIVATE)
    fillet2_piece_22 = fillet2_piece_22a & fillet2_piece_22b
    add(fillet2_piece_22, mode=Mode.SUBTRACT)
    with BuildSketch(Plane(origin=(16.5, 10, -5), x_dir=(0, -1, 0), z_dir=(-1, 0, 0))) as fillet2_piece_23a_section:
        with BuildLine():
            CenterArc((FILLET2_R, -FILLET2_R), FILLET2_R, 90, 90)
            Line((0, -FILLET2_R), (0, 0))
            Line((0, 0), (FILLET2_R, 0))
        make_face()
    fillet2_piece_23a = extrude(amount=12, mode=Mode.PRIVATE)
    fillet2_piece_23a = split(fillet2_piece_23a, bisect_by=Plane(origin=(7, 9.773604886, -5.226395114), z_dir=(-1, 0, 0)), keep=Keep.TOP, mode=Mode.PRIVATE)
    with BuildSketch(Plane(origin=(7, 10, -1), x_dir=(-1, 0, 0), z_dir=(0, 0, -1))) as fillet2_piece_23b_section:
        with BuildLine():
            CenterArc((FILLET2_R, -FILLET2_R), FILLET2_R, 90, 90)
            Line((0, -FILLET2_R), (0, 0))
            Line((0, 0), (FILLET2_R, 0))
        make_face()
    fillet2_piece_23b = extrude(amount=6.5, mode=Mode.PRIVATE)
    fillet2_piece_23b = split(fillet2_piece_23b, bisect_by=Plane(origin=(6.773604886, 9.773604886, -5), z_dir=(0, 0, -1)), keep=Keep.TOP, mode=Mode.PRIVATE)
    fillet2_piece_23 = fillet2_piece_23a & fillet2_piece_23b
    add(fillet2_piece_23, mode=Mode.SUBTRACT)

    # Fillet3
    # the kernel refuses this fillet: 3 mm, written as the material it takes off along each edge
    with BuildSketch(Plane(origin=(11, -7, 0), x_dir=(0, -1, 0), z_dir=(-1, 0, 0))) as fillet3_piece_1:
        with BuildLine():
            CenterArc((2, -1), 1, 0, 90)
            Line((3, -1), (3, 0))
            Line((3, 0), (2, 0))
        make_face()
    revolve(axis=Axis((11, -7, 0), (0, 0, 1)), revolution_arc=90, mode=Mode.SUBTRACT)
    with BuildSketch(Plane(origin=(11, 7, -5), x_dir=(1, 0, 0), z_dir=(0, -1, 0))) as fillet3_piece_2:
        with BuildLine():
            CenterArc((2, -1), 1, 0, 90)
            Line((3, -1), (3, 0))
            Line((3, 0), (2, 0))
        make_face()
    revolve(axis=Axis((11, 7, -5), (0, 0, 1)), revolution_arc=90, mode=Mode.SUBTRACT)
    with BuildSketch(Plane(origin=(11, 7, -7.796396689), x_dir=(0.990830168044299, 0, -0.1351132047333135), z_dir=(0, 1, 0))) as fillet3_piece_3_section:
        Polygon((0, 0), (FILLET3_R, 0), (FILLET3_R, -FILLET3_R * 0.0678677703915), (FILLET3_R * 0.990830168044, -FILLET3_R * 0.135113204733), align=None)
    fillet3_piece_3 = extrude(amount=FILLET3_R, mode=Mode.PRIVATE)
    fillet3_piece_3 = fillet3_piece_3 - Plane(origin=(11, 7, -7.796396689), x_dir=(-0.9977049082880917, 0, 0.06771200763417462), z_dir=(0, 1, 0)) * Sphere(FILLET3_R, mode=Mode.PRIVATE)
    add(fillet3_piece_3, mode=Mode.SUBTRACT)
    with BuildSketch(Plane(origin=(11, -7, -7.796396689), x_dir=(1, 0, 0), z_dir=(0, -1, 0))) as fillet3_piece_4_section:
        Polygon((0, 0), (FILLET3_R, 0), (FILLET3_R, -FILLET3_R * 0.0678677703915), (FILLET3_R * 0.990830168044, -FILLET3_R * 0.135113204733), align=None)
    fillet3_piece_4 = extrude(amount=FILLET3_R, mode=Mode.PRIVATE)
    fillet3_piece_4 = fillet3_piece_4 - Plane(origin=(11, -7, -7.796396689), x_dir=(-0.9977049082880917, 0, 0.06771200763417462), z_dir=(0, -1, 0)) * Sphere(FILLET3_R, mode=Mode.PRIVATE)
    add(fillet3_piece_4, mode=Mode.SUBTRACT)
    with BuildSketch(Plane(origin=(3.580425993, 10, -21.5), x_dir=(0, 0, -1), z_dir=(-1, 0, 0))) as fillet3_piece_5:
        with BuildLine():
            CenterArc((8.5 - FILLET3_R, FILLET3_R), FILLET3_R, 270, 90)
            Line((8.5, FILLET3_R), (8.5, 0))
            Line((8.5, 0), (8.5 - FILLET3_R, 0))
        make_face()
    revolve(axis=Axis((3.580425993, 10, -21.5), (0, -1, 0)), revolution_arc=82.234833982, mode=Mode.SUBTRACT)
    with BuildSketch(Plane(origin=(13.972490504, 10, -8.201736303), x_dir=(-0.9908301680442989, 0, 0.13511320473331348), z_dir=(-0.1351132047333135, 0, -0.990830168044299)), Plane(origin=(13.972490504, -10, -8.201736303), x_dir=(0, 1, 0), z_dir=(-0.1351132047333135, 0, -0.990830168044299))) as fillet3_piece_6:
        with BuildLine():
            CenterArc((FILLET3_R, -FILLET3_R), FILLET3_R, 90, 90)
            Line((0, -FILLET3_R), (0, 0))
            Line((0, 0), (FILLET3_R, 0))
        make_face()
    extrude(amount=14.580425993, mode=Mode.SUBTRACT)
    with BuildSketch(Plane(origin=(14, 10, -5), x_dir=(0, -1, 0), z_dir=(0, 0, -1))) as fillet3_piece_7:
        with BuildLine():
            CenterArc((FILLET3_R, FILLET3_R), FILLET3_R, 180, 90)
            Line((0, FILLET3_R), (0, 0))
            Line((0, 0), (FILLET3_R, 0))
        make_face()
    extrude(amount=2.796396689, mode=Mode.SUBTRACT)
    with BuildSketch(Plane(origin=(14, -10, 0), x_dir=(0, 1, 0), z_dir=(0, 0, -1))) as fillet3_piece_8:
        with BuildLine():
            CenterArc((FILLET3_R, -FILLET3_R), FILLET3_R, 90, 90)
            Line((0, -FILLET3_R), (0, 0))
            Line((0, 0), (FILLET3_R, 0))
        make_face()
    extrude(amount=7.796396689, mode=Mode.SUBTRACT)
    with BuildSketch(Plane(origin=(3.580425993, -10, -21.5), x_dir=(0, 0, -1), z_dir=(-1, 0, 0))) as fillet3_piece_9:
        with BuildLine():
            CenterArc((8.5 - FILLET3_R, -FILLET3_R), FILLET3_R, 0, 90)
            Line((8.5 - FILLET3_R, 0), (8.5, 0))
            Line((8.5, 0), (8.5, -FILLET3_R))
        make_face()
    revolve(axis=Axis((3.580425993, -10, -21.5), (0, -1, 0)), revolution_arc=82.234833982, mode=Mode.SUBTRACT)
    with BuildSketch(Plane(origin=(3.580425993, 10, -30), x_dir=(0, 0, 1), z_dir=(-1, 0, 0)), Plane(origin=(3.580425993, -10, -30), x_dir=(0, 1, 0), z_dir=(-1, 0, 0))) as fillet3_piece_10:
        with BuildLine():
            CenterArc((FILLET3_R, -FILLET3_R), FILLET3_R, 90, 90)
            Line((0, -FILLET3_R), (0, 0))
            Line((0, 0), (FILLET3_R, 0))
        make_face()
    extrude(amount=8.580425993, mode=Mode.SUBTRACT)
    with BuildSketch(Plane(origin=(14, -7, -8), x_dir=(0, 0, 1), z_dir=(0, 1, 0))) as fillet3_piece_11:
        with BuildLine():
            CenterArc((FILLET3_R * 0.0678677703915, -FILLET3_R), FILLET3_R, 90, 7.765166018)
            Line((-FILLET3_R * 0.0672454343418, -FILLET3_R * 0.0091698319557), (0, 0))
            Line((0, 0), (FILLET3_R * 0.0678677703915, 0))
        make_face()
    extrude(amount=14, mode=Mode.SUBTRACT)


with BuildPart() as body_2:
    # Mirror4: mirrored copy
    add(part.part.mirror(Plane(origin=(0, 0, 0), x_dir=(0, 0, 1), z_dir=(1, 0, 0))))


solid = body_2.part
